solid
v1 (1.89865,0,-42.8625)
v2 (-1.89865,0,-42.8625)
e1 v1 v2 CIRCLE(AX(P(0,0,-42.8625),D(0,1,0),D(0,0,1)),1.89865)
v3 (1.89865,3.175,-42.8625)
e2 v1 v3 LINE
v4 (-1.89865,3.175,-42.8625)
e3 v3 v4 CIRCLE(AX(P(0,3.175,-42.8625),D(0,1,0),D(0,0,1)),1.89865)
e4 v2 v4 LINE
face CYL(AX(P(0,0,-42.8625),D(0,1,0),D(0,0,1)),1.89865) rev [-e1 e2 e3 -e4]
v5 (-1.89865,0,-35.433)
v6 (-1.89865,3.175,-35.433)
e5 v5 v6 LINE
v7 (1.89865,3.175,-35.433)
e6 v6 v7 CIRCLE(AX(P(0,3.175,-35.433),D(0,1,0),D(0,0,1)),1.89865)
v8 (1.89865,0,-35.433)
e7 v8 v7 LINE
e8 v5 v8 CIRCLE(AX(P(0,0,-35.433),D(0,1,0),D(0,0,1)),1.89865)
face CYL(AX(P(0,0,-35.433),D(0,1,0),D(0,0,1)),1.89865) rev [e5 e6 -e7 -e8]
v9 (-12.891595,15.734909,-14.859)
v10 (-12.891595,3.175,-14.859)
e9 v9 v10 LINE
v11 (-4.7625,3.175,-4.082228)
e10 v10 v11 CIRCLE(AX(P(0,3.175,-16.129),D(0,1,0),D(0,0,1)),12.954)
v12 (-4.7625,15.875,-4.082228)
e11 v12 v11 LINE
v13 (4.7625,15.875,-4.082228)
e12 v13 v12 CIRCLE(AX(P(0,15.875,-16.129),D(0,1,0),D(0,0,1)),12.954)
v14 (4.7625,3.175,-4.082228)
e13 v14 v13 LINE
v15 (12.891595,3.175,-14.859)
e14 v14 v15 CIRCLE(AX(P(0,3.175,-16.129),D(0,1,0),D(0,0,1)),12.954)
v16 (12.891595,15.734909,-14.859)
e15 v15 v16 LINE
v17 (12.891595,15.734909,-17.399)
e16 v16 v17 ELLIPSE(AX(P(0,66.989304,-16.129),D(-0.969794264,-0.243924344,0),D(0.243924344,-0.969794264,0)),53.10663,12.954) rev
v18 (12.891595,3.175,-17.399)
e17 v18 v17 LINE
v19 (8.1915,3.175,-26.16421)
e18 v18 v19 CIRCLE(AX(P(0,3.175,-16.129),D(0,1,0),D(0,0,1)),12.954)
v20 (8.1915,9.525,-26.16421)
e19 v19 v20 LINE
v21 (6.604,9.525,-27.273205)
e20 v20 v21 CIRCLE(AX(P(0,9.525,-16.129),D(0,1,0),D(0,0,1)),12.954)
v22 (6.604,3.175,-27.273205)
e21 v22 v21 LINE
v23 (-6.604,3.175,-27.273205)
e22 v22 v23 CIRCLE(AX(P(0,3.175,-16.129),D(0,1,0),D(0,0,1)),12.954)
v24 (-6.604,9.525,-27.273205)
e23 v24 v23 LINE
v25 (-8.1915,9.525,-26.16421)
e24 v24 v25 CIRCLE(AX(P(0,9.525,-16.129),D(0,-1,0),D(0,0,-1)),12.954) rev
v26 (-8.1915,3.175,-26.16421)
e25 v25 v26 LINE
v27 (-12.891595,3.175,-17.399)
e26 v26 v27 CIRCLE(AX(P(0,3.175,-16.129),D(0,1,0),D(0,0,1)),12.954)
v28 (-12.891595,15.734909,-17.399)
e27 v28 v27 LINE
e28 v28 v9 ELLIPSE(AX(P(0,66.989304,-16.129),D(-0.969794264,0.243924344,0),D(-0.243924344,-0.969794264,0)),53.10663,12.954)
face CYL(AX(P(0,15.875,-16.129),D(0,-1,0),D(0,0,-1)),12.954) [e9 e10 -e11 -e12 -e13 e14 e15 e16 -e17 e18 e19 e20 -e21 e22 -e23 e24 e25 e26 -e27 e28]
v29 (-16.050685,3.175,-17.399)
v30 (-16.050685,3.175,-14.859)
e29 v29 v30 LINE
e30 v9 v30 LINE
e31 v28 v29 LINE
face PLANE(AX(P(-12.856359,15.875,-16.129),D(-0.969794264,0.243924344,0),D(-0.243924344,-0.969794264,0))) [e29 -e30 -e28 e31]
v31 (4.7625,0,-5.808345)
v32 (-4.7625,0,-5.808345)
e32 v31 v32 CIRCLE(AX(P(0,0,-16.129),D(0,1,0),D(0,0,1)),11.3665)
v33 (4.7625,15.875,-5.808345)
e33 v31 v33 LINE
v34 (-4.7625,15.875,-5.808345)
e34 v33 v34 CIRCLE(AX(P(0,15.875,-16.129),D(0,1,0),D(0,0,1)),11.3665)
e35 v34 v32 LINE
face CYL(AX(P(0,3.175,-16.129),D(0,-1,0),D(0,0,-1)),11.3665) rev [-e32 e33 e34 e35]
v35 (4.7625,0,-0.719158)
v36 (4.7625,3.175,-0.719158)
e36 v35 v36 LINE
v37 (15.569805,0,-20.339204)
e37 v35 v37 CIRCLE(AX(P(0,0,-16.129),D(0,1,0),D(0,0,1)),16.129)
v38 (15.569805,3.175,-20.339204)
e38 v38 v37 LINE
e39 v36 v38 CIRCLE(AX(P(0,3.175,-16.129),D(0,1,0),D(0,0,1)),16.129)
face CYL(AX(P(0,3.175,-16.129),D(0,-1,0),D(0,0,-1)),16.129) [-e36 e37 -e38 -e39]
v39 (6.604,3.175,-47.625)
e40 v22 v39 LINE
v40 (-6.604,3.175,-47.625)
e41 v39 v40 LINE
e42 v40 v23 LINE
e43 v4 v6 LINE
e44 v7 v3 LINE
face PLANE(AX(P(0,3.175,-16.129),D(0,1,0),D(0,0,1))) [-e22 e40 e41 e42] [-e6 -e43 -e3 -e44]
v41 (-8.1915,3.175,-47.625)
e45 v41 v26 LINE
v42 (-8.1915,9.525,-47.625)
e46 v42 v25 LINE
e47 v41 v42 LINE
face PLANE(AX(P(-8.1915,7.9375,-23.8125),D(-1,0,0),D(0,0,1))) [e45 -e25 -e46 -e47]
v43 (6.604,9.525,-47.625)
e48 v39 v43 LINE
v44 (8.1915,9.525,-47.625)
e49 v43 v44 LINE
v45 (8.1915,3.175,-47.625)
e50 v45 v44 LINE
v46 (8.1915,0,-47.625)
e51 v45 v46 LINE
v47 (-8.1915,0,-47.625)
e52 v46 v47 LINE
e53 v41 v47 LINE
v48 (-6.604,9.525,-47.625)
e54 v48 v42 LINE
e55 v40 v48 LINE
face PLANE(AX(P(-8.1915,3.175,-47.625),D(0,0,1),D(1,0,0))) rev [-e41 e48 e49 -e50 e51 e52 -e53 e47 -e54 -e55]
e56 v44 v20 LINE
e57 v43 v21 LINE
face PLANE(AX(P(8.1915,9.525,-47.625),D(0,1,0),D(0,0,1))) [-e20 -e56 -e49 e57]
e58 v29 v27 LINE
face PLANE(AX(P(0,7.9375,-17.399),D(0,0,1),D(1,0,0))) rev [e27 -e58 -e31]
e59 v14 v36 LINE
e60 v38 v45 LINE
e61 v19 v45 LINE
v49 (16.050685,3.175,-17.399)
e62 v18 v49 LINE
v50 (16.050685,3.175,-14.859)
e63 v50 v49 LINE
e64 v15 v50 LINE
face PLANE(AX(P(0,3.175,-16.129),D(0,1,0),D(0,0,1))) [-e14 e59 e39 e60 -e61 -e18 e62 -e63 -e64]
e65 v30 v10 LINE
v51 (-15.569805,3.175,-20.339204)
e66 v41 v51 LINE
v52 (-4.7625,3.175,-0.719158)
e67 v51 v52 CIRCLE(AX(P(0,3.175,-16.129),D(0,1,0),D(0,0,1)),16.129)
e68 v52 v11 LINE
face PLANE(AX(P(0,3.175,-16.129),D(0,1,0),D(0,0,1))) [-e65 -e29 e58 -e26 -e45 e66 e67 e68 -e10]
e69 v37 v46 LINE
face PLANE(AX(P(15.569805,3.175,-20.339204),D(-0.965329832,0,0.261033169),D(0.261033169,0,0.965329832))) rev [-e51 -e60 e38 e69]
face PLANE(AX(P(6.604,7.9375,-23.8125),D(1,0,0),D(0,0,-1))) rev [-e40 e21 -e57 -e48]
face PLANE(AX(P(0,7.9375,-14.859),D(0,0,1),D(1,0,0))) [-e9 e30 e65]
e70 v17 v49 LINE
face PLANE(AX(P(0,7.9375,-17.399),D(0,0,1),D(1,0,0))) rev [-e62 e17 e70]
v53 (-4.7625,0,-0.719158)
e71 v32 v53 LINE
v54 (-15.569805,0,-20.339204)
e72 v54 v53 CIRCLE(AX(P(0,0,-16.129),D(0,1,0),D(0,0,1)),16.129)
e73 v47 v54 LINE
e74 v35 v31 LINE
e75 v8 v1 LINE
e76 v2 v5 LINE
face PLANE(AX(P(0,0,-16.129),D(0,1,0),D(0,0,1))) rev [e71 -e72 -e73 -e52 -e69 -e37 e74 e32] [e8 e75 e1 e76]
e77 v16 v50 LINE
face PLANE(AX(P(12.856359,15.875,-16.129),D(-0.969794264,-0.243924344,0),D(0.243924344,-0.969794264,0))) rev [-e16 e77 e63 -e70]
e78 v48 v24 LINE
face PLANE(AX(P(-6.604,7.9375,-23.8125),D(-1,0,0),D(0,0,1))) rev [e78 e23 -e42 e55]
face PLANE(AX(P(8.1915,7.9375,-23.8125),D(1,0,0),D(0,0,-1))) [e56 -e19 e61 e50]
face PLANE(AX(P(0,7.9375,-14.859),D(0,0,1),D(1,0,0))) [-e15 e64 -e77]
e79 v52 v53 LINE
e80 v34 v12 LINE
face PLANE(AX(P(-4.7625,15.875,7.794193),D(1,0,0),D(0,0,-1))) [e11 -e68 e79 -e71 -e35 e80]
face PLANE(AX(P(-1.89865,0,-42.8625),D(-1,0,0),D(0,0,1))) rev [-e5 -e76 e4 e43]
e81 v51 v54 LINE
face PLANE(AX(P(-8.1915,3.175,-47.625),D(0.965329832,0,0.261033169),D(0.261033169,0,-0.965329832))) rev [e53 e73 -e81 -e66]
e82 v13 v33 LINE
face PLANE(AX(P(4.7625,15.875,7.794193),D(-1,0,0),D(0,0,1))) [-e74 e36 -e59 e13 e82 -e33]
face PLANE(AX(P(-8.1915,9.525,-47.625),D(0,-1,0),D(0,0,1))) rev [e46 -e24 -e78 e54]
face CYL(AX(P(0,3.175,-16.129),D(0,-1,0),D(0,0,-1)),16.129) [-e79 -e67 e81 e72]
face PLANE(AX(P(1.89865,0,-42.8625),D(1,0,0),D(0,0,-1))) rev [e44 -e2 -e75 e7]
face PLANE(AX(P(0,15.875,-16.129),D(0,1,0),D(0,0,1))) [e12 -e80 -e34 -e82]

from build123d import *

# Parameters (mm, degrees)
SKETCH8_R           = 11.3665
BOSS_EXTRUDE3_DEPTH = 3.175
SKETCH9_R           = 12.954
SKETCH9_R_2         = 11.3665
BOSS_EXTRUDE4_DEPTH = 12.7
RIB12_REACH         = 40.783
SKETCH13_WALL_W     = 92.662520058
SKETCH13_WALL_H     = 2.54
CUT_EXTRUDE1_DEPTH  = 52.861115163
RIB1_START          = -47.625
RIB1_OUTLINE_W      = 1.5875
RIB1_OUTLINE_H      = 6.35
RIB1_DEPTH          = 21.4607898
SKETCH16_W          = 9.525
SKETCH16_H          = 15.588386278
CUT_EXTRUDE3_DEPTH  = 53.72855859


# Read off the part's stored shape, not the designer's step: Rib1
with BuildPart() as part:
    # Sketch8 → Boss-Extrude3 (new body)
    with BuildSketch(Plane(origin=(0, 0, 0), x_dir=(1, 0, 0), z_dir=(0, 1, 0))):
        with BuildLine():
            Line((-8.1915, 47.625), (8.1915, 47.625))
            Line((8.1915, 47.625), (15.569804863, 20.339203977))
            ThreePointArc((15.569804863, 20.339203977), (0, 0), (-15.569804863, 20.339203977))
            Line((-15.569804863, 20.339203977), (-8.1915, 47.625))
        make_face()
        with Locations(Location((0, 16.129, 0), (0, 0, 270))):
            Circle(SKETCH8_R, mode=Mode.SUBTRACT)
    extrude(amount=BOSS_EXTRUDE3_DEPTH)

    # Sketch9 → Boss-Extrude4 (add)
    with BuildSketch(Plane(origin=(0, 3.175, 0), x_dir=(1, 0, 0), z_dir=(0, 1, 0))):
        with Locations(Location((0, 16.129, 0), (0, 0, 270))):
            Circle(SKETCH9_R)
        with Locations(Location((0, 16.129, 0), (0, 0, 270))):
            Circle(SKETCH9_R_2, mode=Mode.SUBTRACT)
    extrude(amount=BOSS_EXTRUDE4_DEPTH)

    # Sketch13 wall → Rib12 (add, up to next)
    with BuildSketch(Plane(origin=(-14.453521799, 9.525, -16.129), x_dir=(-0.243924343996, -0.969794263958, 0), z_dir=(0.969794263958, -0.243924343996, 0)), mode=Mode.PRIVATE) as rib12_sk1:
        Rectangle(SKETCH13_WALL_W, SKETCH13_WALL_H)
    rib12_tool1 = extrude(rib12_sk1.sketch, amount=RIB12_REACH, mode=Mode.PRIVATE) - part.part
    rib12 = rib12_tool1.solids().sort_by_distance((-14.453521799, 9.525, -16.129))[0]
    add(rib12)

    # Mirror2: Rib12 across plane
    add(rib12.mirror(Plane(origin=(0, 0, 0), x_dir=(0, 0, 1), z_dir=(1, 0, 0))))

    # Sketch11 → Cut-Extrude1 (cut, through all)
    with BuildSketch(Plane(origin=(0, 3.175, 0), x_dir=(1, 0, 0), z_dir=(0, 1, 0))):
        with BuildLine():
            Line((1.89865, 42.8625), (1.89865, 35.433))
            ThreePointArc((1.89865, 35.433), (0, 33.53435), (-1.89865, 35.433))
            Line((-1.89865, 35.433), (-1.89865, 42.8625))
            ThreePointArc((-1.89865, 42.8625), (0, 44.76115), (1.89865, 42.8625))
        make_face()
    extrude(amount=-CUT_EXTRUDE1_DEPTH, mode=Mode.SUBTRACT)

    # Rib1 outline → Rib1 (add)
    with BuildSketch(Plane.XY.offset(RIB1_START)):
        with Locations((-7.39775, 6.35)):
            Rectangle(RIB1_OUTLINE_W, RIB1_OUTLINE_H)
    rib1 = extrude(amount=RIB1_DEPTH)

    # Mirror1: Rib1 across plane
    add(rib1.mirror(Plane(origin=(0, 0, 0), x_dir=(0, 0, 1), z_dir=(1, 0, 0))))

    # Sketch16 → Cut-Extrude3 (cut, through all)
    with BuildSketch(Plane(origin=(0, 0, 0), x_dir=(1, 0, 0), z_dir=(0, 1, 0))):
        Rectangle(SKETCH16_W, SKETCH16_H)
    extrude(amount=CUT_EXTRUDE3_DEPTH, mode=Mode.SUBTRACT)


solid = part.part
